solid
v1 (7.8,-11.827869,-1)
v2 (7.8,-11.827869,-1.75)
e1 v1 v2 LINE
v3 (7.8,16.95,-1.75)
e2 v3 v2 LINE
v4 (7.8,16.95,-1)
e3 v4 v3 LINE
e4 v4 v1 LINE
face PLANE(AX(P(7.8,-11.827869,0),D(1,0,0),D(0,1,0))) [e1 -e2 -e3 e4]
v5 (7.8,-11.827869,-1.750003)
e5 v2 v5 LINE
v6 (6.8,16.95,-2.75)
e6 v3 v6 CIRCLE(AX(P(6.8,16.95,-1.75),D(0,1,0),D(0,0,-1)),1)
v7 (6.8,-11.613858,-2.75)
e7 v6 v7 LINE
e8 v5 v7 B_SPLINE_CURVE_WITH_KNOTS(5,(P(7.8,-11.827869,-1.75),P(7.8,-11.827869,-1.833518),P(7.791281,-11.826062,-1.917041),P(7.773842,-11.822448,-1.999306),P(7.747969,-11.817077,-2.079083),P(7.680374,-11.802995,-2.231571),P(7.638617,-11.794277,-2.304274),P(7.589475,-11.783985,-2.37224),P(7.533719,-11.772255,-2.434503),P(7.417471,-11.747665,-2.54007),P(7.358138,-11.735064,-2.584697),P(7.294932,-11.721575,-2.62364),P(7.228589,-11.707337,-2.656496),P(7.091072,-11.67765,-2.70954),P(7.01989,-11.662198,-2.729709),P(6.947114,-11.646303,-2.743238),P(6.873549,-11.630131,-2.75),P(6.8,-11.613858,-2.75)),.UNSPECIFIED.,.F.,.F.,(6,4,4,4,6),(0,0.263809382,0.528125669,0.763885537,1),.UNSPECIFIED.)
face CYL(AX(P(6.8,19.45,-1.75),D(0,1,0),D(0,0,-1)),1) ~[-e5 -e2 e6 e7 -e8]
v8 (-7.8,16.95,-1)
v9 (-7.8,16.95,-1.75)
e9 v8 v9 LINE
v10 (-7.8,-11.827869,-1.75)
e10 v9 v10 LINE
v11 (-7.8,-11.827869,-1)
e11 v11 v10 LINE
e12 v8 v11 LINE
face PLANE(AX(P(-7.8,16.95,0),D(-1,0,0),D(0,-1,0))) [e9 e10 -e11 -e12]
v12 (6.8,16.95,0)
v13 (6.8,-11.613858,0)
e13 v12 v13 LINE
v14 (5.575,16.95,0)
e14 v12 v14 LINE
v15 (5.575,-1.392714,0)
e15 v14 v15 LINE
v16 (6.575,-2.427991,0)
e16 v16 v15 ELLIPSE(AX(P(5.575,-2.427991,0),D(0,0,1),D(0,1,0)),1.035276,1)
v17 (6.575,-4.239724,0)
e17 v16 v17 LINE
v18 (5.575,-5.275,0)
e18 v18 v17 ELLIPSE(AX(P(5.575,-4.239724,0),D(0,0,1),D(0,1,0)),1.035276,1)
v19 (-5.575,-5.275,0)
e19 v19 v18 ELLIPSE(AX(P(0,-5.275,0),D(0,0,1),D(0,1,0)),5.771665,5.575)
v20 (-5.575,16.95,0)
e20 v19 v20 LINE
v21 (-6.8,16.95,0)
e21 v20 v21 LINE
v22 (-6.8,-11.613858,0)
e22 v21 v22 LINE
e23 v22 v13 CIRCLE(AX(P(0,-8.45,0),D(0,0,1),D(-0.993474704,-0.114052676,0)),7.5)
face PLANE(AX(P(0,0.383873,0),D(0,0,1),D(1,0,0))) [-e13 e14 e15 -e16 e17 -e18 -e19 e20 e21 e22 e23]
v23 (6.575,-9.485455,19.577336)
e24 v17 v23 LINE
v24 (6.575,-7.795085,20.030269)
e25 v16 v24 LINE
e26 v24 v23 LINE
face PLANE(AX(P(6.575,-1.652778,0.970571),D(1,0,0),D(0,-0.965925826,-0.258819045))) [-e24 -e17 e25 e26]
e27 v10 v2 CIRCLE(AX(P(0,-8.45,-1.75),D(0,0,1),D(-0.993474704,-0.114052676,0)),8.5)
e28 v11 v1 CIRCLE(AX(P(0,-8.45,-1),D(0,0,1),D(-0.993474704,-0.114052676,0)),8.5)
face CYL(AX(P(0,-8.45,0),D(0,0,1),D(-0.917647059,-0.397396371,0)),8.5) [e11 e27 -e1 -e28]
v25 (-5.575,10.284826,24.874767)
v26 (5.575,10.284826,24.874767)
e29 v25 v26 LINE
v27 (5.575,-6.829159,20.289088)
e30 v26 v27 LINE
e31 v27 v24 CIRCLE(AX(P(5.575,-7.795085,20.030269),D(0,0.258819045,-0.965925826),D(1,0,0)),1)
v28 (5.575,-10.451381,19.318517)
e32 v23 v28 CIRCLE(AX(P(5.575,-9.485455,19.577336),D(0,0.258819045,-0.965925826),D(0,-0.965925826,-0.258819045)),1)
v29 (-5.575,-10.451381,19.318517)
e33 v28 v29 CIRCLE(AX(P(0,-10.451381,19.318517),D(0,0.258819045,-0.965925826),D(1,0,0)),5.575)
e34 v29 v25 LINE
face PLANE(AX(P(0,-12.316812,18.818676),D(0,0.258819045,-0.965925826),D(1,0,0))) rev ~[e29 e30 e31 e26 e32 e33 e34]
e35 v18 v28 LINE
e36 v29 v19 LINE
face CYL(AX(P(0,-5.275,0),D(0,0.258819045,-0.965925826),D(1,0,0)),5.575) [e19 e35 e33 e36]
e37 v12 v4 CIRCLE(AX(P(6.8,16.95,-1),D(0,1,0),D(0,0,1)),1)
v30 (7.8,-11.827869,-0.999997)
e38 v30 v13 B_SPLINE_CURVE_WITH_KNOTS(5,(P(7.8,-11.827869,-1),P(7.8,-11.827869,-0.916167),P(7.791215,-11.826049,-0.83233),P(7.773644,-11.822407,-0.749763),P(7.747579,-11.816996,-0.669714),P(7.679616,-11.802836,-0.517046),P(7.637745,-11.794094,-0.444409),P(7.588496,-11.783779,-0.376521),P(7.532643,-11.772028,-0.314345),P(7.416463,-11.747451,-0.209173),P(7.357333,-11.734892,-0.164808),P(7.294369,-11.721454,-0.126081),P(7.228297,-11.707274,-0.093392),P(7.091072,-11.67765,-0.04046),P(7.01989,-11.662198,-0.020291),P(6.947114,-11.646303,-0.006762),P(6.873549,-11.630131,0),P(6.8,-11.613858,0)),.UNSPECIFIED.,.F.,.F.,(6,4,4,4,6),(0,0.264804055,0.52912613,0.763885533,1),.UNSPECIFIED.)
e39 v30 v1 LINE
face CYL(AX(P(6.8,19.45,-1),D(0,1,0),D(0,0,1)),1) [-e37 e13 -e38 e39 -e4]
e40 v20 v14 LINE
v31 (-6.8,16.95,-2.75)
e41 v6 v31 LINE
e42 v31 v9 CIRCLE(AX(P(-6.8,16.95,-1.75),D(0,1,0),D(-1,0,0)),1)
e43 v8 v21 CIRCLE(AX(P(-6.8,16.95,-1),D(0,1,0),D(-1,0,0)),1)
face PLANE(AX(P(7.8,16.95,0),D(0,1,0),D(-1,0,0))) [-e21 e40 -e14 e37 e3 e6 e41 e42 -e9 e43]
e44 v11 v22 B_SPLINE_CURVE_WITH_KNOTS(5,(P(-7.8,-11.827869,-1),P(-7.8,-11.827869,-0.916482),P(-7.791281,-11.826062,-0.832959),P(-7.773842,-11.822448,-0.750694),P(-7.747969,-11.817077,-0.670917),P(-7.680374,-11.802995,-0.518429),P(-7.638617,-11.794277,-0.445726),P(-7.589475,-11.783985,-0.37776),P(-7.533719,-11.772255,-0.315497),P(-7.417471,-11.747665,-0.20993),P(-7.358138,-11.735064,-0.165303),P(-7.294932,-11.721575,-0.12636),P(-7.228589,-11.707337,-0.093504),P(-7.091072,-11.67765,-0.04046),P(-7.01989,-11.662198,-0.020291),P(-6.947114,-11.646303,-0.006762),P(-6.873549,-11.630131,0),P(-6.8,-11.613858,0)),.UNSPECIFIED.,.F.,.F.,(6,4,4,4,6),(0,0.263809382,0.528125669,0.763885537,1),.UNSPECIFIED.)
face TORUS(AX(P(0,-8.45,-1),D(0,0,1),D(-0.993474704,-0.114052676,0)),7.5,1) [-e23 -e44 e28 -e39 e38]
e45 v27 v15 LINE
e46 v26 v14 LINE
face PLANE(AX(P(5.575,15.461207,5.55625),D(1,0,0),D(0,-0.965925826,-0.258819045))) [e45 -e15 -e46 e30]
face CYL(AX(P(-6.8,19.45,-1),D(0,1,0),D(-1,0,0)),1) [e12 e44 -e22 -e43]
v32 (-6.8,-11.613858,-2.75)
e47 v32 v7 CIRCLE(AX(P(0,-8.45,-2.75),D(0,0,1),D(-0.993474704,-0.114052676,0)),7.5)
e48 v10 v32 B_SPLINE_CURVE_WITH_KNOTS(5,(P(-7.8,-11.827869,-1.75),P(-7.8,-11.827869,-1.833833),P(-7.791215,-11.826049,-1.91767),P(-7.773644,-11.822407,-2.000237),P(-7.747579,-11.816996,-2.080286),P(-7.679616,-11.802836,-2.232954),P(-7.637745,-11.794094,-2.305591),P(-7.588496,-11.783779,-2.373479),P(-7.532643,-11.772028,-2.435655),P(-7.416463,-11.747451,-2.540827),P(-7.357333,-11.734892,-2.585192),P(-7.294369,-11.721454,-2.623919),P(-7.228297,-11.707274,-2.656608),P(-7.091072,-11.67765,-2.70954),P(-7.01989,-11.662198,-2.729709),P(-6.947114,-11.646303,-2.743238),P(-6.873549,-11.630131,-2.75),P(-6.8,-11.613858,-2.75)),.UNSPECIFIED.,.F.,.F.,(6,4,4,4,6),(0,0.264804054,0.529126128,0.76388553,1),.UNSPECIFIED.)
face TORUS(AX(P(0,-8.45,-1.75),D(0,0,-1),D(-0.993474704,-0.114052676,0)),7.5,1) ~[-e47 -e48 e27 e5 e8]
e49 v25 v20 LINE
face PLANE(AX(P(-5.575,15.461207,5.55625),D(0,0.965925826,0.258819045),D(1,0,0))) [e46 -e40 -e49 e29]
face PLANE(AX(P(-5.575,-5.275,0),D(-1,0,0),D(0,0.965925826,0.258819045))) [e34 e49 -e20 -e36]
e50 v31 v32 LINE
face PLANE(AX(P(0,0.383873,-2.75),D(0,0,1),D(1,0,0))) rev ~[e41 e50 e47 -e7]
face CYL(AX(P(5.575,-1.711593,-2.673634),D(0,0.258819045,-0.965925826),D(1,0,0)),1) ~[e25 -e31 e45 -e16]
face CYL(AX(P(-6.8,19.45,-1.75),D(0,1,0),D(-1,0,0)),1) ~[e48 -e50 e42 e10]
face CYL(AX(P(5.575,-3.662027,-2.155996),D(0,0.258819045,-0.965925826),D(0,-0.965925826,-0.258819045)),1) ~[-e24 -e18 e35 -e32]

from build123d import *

# Parameters (mm, degrees)
F2_W         = 1
F2_H         = 3.75
F3_DEPTH     = 20
F0_W         = 11.15
F0_H         = 22.225
F0_H_2       = 6.0527027428
F4_DEPTH     = 25
F5_DEPTH     = 2.75
F6_T1_DEPTH  = 33.7778691508
F6_T4_ANGLE  = 166.9020242579
F6_T6_ANGLE  = 166.9020242579
F6_T10_DEPTH = 25
F6_T15_DEPTH = 26.0048094716


# Not quite as in the source:
# - a fillet or chamfer that OpenCascade refuses, or shapes differently, is made with other operations: its cross-section is extruded or revolved along the edge and cut away or added


with BuildPart() as f3:
    # F2 (on line) → F3 (new body, symmetric)
    with BuildSketch(Plane(origin=(0, -0.3533579975, 1.31875), x_dir=(1, 0, 0), z_dir=(0, 0.2588190451, -0.9659258263))):
        with BuildLine():
            ThreePointArc((5.575, 5.0952587337), (0, 10.6702587337), (-5.575, 5.0952587337))
            Line((-5.575, 5.0952587337), (5.575, 5.0952587337))
        make_face()
        Polygon((5.575, 5.0952587337), (-5.575, 5.0952587337), (-5.575, -16.3724427556), (5.575, -16.3724427556), (5.575, 1.3452587337), align=None)
        with Locations((6.075, 3.2202587337)):
            Rectangle(F2_W, F2_H)
    extrude(amount=F3_DEPTH, both=True)

    # F0 (on Top) → F4 (cut)
    with BuildSketch(Plane.XY):
        with BuildLine():
            Line((5.575, -5.275), (-5.575, -5.275))
            ThreePointArc((-5.575, -5.275), (0, -10.85), (5.575, -5.275))
        make_face()
        with BuildLine():
            Line((-5.575, 16.95), (-7.8, 16.95))
            Line((-7.8, 16.95), (-7.8, -11.8278691508))
            ThreePointArc((-7.8, -11.8278691508), (-4.6657321086, -15.5549942921), (0, -16.95))
            ThreePointArc((0, -16.95), (4.6657321086, -15.5549942921), (7.8, -11.8278691508))
            Line((7.8, -11.8278691508), (7.8, 16.95))
            Line((7.8, 16.95), (5.575, 16.95))
            Line((5.575, 16.95), (5.575, -5.275))
            ThreePointArc((5.575, -5.275), (0, -10.85), (-5.575, -5.275))
            Line((-5.575, -5.275), (-5.575, 16.95))
        make_face()
        with Locations((0, 5.8375)):
            Rectangle(F0_W, F0_H)
        with Locations((0, 19.9763513714)):
            Rectangle(F0_W, F0_H_2)
    extrude(amount=-F4_DEPTH, mode=Mode.SUBTRACT)

    # F0 (on Top) → F5 (join)
    with BuildSketch(Plane.XY):
        with BuildLine():
            Line((-5.575, 16.95), (-7.8, 16.95))
            Line((-7.8, 16.95), (-7.8, -11.8278691508))
            ThreePointArc((-7.8, -11.8278691508), (-4.6657321086, -15.5549942921), (0, -16.95))
            ThreePointArc((0, -16.95), (4.6657321086, -15.5549942921), (7.8, -11.8278691508))
            Line((7.8, -11.8278691508), (7.8, 16.95))
            Line((7.8, 16.95), (5.575, 16.95))
            Line((5.575, 16.95), (5.575, -5.275))
            ThreePointArc((5.575, -5.275), (0, -10.85), (-5.575, -5.275))
            Line((-5.575, -5.275), (-5.575, 16.95))
        make_face()
        with BuildLine():
            Line((5.575, -5.275), (-5.575, -5.275))
            ThreePointArc((-5.575, -5.275), (0, -10.85), (5.575, -5.275))
        make_face()
        with Locations((0, 5.8375)):
            Rectangle(F0_W, F0_H)
    extrude(amount=-F5_DEPTH)

    # F6: fillet of radius 1 on 8 edges, made by hand

    # F6_s2 → F6_t1 (cut)
    with BuildSketch(Plane.XZ.offset(-19.45)):
        with BuildLine():
            ThreePointArc((6.8, 0), (7.5071067812, -0.2928932188), (7.8, -1))
            Line((7.8, -1), (7.8, 0))
            Line((7.8, 0), (6.8, 0))
        make_face()
        with BuildLine():
            ThreePointArc((6.8, -2.75), (7.5071067812, -2.4571067812), (7.8, -1.75))
            Line((7.8, -1.75), (7.8, -2.75))
            Line((7.8, -2.75), (6.8, -2.75))
        make_face()
        with BuildLine():
            ThreePointArc((-7.8, -1), (-7.5071067812, -0.2928932188), (-6.8, 0))
            Line((-6.8, 0), (-7.8, 0))
            Line((-7.8, 0), (-7.8, -1))
        make_face()
        with BuildLine():
            ThreePointArc((-7.8, -1.75), (-7.5071067812, -2.4571067812), (-6.8, -2.75))
            Line((-6.8, -2.75), (-7.8, -2.75))
            Line((-7.8, -2.75), (-7.8, -1.75))
        make_face()
    extrude(amount=F6_T1_DEPTH, mode=Mode.SUBTRACT)

    # F6_s3 → F6_t4 (revolve, cut)
    with BuildSketch(Plane(origin=(0.9574563888, -8.3400822912, 0), x_dir=(0, 0, 1), z_dir=(-0.1140526759, 0.9934747038, 0))):
        with BuildLine():
            ThreePointArc((-1, -9.4637451111), (-0.2928932188, -9.1708518923), (0, -8.4637451111))
            Line((0, -8.4637451111), (0, -9.4637451111))
            Line((0, -9.4637451111), (-1, -9.4637451111))
        make_face()
    revolve(axis=Axis((0, -8.45, 0), (0, 0, 1)), revolution_arc=F6_T4_ANGLE, mode=Mode.SUBTRACT)

    # F6_s5 → F6_t6 (revolve, cut)
    with BuildSketch(Plane(origin=(0.9574563888, -8.3400822912, 0), x_dir=(0, 0, 1), z_dir=(-0.1140526759, 0.9934747038, 0))):
        with BuildLine():
            ThreePointArc((-1.75, -9.4637451111), (-2.4571067812, -9.1708518923), (-2.75, -8.4637451111))
            Line((-2.75, -8.4637451111), (-2.75, -9.4637451111))
            Line((-2.75, -9.4637451111), (-1.75, -9.4637451111))
        make_face()
    revolve(axis=Axis((0, -8.45, -2.75), (0, 0, 1)), revolution_arc=F6_T6_ANGLE, mode=Mode.SUBTRACT)


with BuildPart() as f6_tool8:
    # F6_s9 → F6_t10 (new body)
    with BuildSketch(Plane(origin=(0, 0.2936896152, -1.0960645657), x_dir=(1, 0, 0), z_dir=(0, -0.2588190451, 0.9659258263))):
        with BuildLine():
            ThreePointArc((5.575, -5.0952587337), (6.2821067812, -4.8023655149), (6.575, -4.0952587337))
            Line((6.575, -4.0952587337), (6.575, -5.0952587337))
            Line((6.575, -5.0952587337), (5.575, -5.0952587337))
        make_face()
    extrude(amount=F6_T10_DEPTH)

    split(bisect_by=Plane.XY, keep=Keep.TOP)


with BuildPart() as f3_1:
    add(f3.part)

    # F6_t7: cut F6_tool8
    add(f6_tool8.part, mode=Mode.SUBTRACT)


with BuildPart() as f6_tool13:
    # F6_s14 → F6_t15 (new body)
    with BuildSketch(Plane(origin=(0, 0.5537534432, -2.0666359849), x_dir=(1, 0, 0), z_dir=(0, -0.2588190451, 0.9659258263))):
        with BuildLine():
            ThreePointArc((6.575, -2.3452587337), (6.2821067812, -1.6381519525), (5.575, -1.3452587337))
            Line((5.575, -1.3452587337), (6.575, -1.3452587337))
            Line((6.575, -1.3452587337), (6.575, -2.3452587337))
        make_face()
    extrude(amount=F6_T15_DEPTH)

    split(bisect_by=Plane.XY, keep=Keep.TOP)


with BuildPart() as f3_2:
    add(f3_1.part)

    # F6_t12: cut F6_tool13
    add(f6_tool13.part, mode=Mode.SUBTRACT)


solid = f3_2.part
